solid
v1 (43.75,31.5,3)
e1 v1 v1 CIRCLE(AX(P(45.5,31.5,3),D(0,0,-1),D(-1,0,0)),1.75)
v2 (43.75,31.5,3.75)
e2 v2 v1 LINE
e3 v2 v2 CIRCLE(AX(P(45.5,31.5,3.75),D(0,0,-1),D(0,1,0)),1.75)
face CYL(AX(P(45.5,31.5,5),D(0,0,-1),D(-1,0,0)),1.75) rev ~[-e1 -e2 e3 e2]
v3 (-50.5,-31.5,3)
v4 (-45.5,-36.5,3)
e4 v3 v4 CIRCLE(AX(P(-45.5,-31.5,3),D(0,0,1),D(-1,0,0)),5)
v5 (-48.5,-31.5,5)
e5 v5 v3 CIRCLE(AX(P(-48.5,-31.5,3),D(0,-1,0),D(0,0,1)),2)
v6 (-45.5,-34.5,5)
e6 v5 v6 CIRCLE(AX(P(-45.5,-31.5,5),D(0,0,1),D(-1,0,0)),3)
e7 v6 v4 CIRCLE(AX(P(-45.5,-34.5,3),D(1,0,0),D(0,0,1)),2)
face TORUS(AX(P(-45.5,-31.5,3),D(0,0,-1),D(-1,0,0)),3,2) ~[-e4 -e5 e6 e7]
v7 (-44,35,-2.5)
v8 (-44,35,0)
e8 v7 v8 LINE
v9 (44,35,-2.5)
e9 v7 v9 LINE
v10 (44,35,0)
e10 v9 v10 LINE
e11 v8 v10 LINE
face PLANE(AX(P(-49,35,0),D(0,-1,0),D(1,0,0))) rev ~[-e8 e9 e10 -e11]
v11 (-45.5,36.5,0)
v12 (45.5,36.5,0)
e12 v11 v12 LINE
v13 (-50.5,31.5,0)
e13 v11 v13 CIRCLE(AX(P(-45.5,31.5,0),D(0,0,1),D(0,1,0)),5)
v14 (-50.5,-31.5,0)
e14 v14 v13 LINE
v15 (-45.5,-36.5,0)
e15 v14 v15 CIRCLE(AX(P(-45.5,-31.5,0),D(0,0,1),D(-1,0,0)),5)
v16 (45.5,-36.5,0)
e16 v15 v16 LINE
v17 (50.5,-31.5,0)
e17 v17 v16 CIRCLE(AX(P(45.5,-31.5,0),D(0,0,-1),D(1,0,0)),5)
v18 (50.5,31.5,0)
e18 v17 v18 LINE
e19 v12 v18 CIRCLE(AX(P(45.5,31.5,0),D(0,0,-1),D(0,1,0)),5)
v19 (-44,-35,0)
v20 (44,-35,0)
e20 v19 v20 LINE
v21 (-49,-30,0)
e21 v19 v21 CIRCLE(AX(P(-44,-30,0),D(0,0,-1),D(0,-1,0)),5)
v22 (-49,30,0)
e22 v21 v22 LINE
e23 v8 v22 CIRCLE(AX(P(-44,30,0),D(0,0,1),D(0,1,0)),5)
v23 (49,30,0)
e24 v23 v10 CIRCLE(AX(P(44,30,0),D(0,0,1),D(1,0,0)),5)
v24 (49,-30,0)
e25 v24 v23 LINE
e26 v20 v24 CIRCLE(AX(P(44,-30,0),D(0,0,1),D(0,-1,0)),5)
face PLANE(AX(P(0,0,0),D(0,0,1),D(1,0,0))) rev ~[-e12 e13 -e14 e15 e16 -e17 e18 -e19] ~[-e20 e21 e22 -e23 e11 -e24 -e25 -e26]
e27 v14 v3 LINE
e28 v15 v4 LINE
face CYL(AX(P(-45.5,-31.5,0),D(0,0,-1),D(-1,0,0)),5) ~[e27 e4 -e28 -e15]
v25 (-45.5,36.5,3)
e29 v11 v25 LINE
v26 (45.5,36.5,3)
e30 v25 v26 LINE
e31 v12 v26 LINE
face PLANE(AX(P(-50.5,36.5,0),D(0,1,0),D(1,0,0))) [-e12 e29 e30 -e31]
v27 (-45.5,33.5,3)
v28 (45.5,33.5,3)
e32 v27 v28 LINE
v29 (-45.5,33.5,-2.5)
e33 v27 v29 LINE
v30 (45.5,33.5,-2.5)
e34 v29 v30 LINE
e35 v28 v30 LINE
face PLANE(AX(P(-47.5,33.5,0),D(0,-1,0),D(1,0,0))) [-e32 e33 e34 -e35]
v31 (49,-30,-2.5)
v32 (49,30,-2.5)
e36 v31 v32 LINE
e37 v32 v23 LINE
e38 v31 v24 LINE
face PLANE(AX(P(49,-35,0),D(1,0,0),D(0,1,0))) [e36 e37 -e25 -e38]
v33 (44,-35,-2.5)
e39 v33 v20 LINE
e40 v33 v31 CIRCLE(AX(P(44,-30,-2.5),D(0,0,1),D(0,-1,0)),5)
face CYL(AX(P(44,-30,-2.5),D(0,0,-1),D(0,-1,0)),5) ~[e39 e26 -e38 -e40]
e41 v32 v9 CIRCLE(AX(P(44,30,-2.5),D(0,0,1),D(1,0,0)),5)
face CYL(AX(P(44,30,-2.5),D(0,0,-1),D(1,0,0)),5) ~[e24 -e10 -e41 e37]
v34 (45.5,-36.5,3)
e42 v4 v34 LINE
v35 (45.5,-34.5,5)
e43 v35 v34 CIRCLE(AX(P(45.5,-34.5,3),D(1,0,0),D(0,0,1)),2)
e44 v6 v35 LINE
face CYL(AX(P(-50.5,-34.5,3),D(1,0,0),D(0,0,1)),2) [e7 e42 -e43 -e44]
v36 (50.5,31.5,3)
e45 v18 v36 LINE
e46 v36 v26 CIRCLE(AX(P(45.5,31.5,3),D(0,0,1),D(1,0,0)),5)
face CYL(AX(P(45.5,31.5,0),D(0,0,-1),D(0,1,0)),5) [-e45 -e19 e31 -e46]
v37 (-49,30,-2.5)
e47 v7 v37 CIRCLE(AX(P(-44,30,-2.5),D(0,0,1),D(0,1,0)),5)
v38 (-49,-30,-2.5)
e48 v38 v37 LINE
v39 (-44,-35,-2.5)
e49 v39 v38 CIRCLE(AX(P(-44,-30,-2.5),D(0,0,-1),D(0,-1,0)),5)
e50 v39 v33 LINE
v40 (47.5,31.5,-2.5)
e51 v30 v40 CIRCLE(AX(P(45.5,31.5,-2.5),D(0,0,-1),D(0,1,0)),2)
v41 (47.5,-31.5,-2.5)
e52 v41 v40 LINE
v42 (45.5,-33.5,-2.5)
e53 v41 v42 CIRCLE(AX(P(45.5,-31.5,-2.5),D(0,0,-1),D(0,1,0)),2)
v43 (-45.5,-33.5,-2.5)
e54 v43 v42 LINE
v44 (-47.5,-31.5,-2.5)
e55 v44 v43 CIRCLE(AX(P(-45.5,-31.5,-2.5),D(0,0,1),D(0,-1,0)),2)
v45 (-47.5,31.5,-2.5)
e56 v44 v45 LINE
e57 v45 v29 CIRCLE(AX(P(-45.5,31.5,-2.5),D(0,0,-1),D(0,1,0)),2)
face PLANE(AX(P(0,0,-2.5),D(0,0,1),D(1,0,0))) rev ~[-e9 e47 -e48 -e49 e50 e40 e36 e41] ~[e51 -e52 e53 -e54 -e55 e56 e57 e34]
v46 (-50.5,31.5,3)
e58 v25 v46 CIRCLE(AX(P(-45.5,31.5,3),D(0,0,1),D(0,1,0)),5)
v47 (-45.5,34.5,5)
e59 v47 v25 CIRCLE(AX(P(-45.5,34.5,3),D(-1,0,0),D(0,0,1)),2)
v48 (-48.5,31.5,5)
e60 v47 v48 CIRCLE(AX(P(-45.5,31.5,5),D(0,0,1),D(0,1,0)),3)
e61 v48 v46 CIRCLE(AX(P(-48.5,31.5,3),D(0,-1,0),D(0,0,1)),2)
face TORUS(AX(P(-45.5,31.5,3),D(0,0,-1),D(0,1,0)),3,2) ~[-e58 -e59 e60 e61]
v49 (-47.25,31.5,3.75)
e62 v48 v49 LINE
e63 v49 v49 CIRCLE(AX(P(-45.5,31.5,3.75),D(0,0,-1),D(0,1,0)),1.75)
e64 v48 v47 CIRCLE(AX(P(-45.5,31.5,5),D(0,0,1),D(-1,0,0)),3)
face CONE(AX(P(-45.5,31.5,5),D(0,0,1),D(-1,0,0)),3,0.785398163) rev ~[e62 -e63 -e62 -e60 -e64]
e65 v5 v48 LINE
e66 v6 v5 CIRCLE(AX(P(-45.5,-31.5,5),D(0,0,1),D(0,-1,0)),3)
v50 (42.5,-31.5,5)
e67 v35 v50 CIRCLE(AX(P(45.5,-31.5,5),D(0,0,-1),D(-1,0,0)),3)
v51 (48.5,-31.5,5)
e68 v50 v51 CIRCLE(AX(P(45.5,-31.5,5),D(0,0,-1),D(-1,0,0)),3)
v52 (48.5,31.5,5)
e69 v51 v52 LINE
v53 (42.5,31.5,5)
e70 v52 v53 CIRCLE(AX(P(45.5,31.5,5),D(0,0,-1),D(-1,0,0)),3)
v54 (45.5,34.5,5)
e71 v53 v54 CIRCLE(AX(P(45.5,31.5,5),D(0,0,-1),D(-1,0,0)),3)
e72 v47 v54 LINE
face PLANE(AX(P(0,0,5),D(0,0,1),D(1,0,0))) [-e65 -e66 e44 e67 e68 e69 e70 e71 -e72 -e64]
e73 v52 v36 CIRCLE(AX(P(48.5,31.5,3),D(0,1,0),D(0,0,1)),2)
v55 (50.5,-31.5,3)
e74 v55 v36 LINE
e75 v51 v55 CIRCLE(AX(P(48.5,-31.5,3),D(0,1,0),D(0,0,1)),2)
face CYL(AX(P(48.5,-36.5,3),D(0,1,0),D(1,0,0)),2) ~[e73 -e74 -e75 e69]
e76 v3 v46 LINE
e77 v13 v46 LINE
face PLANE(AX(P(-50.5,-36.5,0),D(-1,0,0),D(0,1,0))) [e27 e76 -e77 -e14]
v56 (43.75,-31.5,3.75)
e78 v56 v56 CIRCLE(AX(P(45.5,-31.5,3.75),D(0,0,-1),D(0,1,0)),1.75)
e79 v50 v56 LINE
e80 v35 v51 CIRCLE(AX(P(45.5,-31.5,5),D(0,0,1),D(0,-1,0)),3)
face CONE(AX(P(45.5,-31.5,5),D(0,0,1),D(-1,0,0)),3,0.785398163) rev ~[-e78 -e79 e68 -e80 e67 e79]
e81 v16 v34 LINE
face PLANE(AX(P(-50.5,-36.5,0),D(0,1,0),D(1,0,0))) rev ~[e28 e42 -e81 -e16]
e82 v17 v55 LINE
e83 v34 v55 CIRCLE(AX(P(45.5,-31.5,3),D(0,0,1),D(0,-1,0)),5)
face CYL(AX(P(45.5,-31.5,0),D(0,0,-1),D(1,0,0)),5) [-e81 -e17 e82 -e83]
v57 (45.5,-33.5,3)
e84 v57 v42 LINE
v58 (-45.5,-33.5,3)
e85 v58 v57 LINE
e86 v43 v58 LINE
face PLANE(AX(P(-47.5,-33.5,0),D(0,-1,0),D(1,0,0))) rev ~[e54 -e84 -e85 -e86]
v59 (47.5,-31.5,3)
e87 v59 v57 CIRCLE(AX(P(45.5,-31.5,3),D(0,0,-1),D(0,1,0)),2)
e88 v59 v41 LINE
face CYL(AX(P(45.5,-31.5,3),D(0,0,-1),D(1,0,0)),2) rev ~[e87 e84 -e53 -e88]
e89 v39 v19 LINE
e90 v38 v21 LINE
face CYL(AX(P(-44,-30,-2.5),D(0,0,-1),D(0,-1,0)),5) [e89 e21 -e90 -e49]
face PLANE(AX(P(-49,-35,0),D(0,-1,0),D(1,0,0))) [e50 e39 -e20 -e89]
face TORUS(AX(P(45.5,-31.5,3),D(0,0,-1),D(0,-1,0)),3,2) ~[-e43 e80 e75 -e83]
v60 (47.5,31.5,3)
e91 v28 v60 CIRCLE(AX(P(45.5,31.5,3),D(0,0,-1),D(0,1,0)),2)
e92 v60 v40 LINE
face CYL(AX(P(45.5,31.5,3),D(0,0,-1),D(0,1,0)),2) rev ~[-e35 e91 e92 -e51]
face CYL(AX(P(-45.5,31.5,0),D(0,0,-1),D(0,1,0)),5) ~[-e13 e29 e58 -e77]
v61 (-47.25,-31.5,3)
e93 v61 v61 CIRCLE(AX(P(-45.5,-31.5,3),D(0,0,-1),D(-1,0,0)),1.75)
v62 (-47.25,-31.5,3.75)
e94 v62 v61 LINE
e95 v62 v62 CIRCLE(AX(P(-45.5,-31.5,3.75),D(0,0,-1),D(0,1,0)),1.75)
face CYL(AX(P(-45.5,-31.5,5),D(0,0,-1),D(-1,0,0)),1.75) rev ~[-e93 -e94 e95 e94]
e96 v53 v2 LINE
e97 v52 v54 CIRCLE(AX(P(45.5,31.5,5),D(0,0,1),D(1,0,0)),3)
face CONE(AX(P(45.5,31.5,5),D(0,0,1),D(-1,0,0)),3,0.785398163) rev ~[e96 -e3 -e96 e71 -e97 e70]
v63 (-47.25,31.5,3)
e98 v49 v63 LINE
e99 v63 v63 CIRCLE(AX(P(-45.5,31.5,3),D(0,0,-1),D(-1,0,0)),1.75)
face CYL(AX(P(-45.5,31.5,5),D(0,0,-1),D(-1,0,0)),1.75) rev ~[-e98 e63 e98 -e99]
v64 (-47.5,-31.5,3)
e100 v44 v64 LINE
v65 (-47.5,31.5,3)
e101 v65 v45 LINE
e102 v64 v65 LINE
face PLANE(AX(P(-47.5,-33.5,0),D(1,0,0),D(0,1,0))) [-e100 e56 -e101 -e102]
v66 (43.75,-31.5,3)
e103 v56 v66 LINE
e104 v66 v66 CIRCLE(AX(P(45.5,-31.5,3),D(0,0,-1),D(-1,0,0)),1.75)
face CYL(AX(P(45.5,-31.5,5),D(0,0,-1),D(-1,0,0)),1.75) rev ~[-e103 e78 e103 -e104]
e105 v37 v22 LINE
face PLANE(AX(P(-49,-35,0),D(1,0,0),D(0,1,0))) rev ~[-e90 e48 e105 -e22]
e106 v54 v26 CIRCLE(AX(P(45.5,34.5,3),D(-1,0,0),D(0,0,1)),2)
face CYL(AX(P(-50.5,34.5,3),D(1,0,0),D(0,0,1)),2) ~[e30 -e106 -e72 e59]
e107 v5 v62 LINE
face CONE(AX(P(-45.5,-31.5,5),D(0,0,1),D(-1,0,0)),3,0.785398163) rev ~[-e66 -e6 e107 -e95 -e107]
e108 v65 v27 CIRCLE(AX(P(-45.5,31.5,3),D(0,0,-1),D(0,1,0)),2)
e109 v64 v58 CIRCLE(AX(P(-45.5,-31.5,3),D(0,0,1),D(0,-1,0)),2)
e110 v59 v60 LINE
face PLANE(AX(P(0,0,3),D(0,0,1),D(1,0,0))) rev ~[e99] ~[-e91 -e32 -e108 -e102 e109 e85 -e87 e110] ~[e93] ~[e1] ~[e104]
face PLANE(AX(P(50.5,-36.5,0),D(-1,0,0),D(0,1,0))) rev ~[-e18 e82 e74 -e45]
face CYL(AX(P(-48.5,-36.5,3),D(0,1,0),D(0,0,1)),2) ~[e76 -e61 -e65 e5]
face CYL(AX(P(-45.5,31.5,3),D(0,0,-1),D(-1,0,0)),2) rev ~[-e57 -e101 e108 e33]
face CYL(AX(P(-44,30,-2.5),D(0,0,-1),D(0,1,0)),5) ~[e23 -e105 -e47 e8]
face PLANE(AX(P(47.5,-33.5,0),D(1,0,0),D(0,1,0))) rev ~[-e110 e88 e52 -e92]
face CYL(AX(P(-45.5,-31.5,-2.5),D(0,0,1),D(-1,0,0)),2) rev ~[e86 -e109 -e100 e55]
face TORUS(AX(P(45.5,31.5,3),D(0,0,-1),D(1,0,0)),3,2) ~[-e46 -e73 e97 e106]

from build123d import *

# Parameters (mm, degrees)
F0_W           = 101
F0_H           = 73
F0_W_2         = 98
F0_H_2         = 70
F0_W_3         = 95
F0_H_3         = 67
F1_DEPTH       = 5
F2_DEPTH       = 3
F3_DEPTH       = 2.5
F4_R           = 2
F5_T1_DEPTH    = 2.5
F5_T3_DEPTH    = 5
F5_T6_ANGLE    = 90
F5_T8_ANGLE    = 90
F5_T10_ANGLE   = 90
F5_T12_ANGLE   = 90
F7_D           = 3.5
F7_DEPTH       = 6
F7_CSINK_D     = 6
F7_CSINK_ANGLE = 90
F7_TIP         = 1.0515060833


# Not quite as in the source:
# - a fillet or chamfer that OpenCascade refuses, or shapes differently, is made with other operations: its cross-section is extruded or revolved along the edge and cut away or added
# - a feature names something its author has since deleted; it is built from what else it names


with BuildPart() as f1:
    # F0 (on Top) → F1 (new body)
    with BuildSketch(Plane.XY):
        Rectangle(F0_W, F0_H)
        Rectangle(F0_W_2, F0_H_2, mode=Mode.SUBTRACT)
        Rectangle(F0_W_2, F0_H_2)
        Rectangle(F0_W_3, F0_H_3, mode=Mode.SUBTRACT)
        Rectangle(F0_W_3, F0_H_3)
    extrude(amount=F1_DEPTH)

    # F0 (on Top) → F2 (cut)
    with BuildSketch(Plane.XY):
        Rectangle(F0_W_3, F0_H_3)
    extrude(amount=F2_DEPTH, mode=Mode.SUBTRACT)

    # F0 (on Top) → F3 (join)
    with BuildSketch(Plane.XY):
        Rectangle(F0_W_2, F0_H_2)
        Rectangle(F0_W_3, F0_H_3, mode=Mode.SUBTRACT)
    extrude(amount=-F3_DEPTH)

    # F4
    f4_edges = [f1.edges().sort_by_distance(p)[0] for p in [
        (-47.5, -33.5, 0.25),
        (-47.5, 33.5, 0.25),
        (47.5, 33.5, 0.25),
        (47.5, -33.5, 0.25),
        (0, -36.5, 5),
        (50.5, 0, 5),
        (-50.5, 0, 5),
        (0, 36.5, 5),
    ]]
    fillet(f4_edges, radius=F4_R)

    # F5: fillet of radius 5 on 8 edges, made by hand

    # F5_s2 → F5_t1 (cut)
    with BuildSketch(Plane.XY.offset(-2.5)):
        with BuildLine():
            ThreePointArc((-44, -35), (-47.5355339059, -33.5355339059), (-49, -30))
            Line((-49, -30), (-49.1, -30))
            Line((-49.1, -30), (-49.1, -35.1))
            Line((-49.1, -35.1), (-44, -35.1))
            Line((-44, -35.1), (-44, -35))
        make_face()
        with BuildLine():
            ThreePointArc((44, -35), (47.5355339059, -33.5355339059), (49, -30))
            Line((49, -30), (49.1, -30))
            Line((49.1, -30), (49.1, -35.1))
            Line((49.1, -35.1), (44, -35.1))
            Line((44, -35.1), (44, -35))
        make_face()
        with BuildLine():
            ThreePointArc((49, 30), (47.5355339059, 33.5355339059), (44, 35))
            Line((44, 35), (44, 35.1))
            Line((44, 35.1), (49.1, 35.1))
            Line((49.1, 35.1), (49.1, 30))
            Line((49.1, 30), (49, 30))
        make_face()
        with BuildLine():
            ThreePointArc((-44, 35), (-47.5355339059, 33.5355339059), (-49, 30))
            Line((-49, 30), (-49.1, 30))
            Line((-49.1, 30), (-49.1, 35.1))
            Line((-49.1, 35.1), (-44, 35.1))
            Line((-44, 35.1), (-44, 35))
        make_face()
    extrude(amount=F5_T1_DEPTH, mode=Mode.SUBTRACT)

    # F5_s4 → F5_t3 (cut)
    with BuildSketch(Plane.XY):
        with BuildLine():
            ThreePointArc((-50.5, -31.5), (-49.0355339059, -35.0355339059), (-45.5, -36.5))
            Line((-45.5, -36.5), (-45.5, -36.6))
            Line((-45.5, -36.6), (-50.6, -36.6))
            Line((-50.6, -36.6), (-50.6, -31.5))
            Line((-50.6, -31.5), (-50.5, -31.5))
        make_face()
        with BuildLine():
            ThreePointArc((50.5, -31.5), (49.0355339059, -35.0355339059), (45.5, -36.5))
            Line((45.5, -36.5), (45.5, -36.6))
            Line((45.5, -36.6), (50.6, -36.6))
            Line((50.6, -36.6), (50.6, -31.5))
            Line((50.6, -31.5), (50.5, -31.5))
        make_face()
        with BuildLine():
            ThreePointArc((45.5, 36.5), (49.0355339059, 35.0355339059), (50.5, 31.5))
            Line((50.5, 31.5), (50.6, 31.5))
            Line((50.6, 31.5), (50.6, 36.6))
            Line((50.6, 36.6), (45.5, 36.6))
            Line((45.5, 36.6), (45.5, 36.5))
        make_face()
        with BuildLine():
            ThreePointArc((-45.5, 36.5), (-49.0355339059, 35.0355339059), (-50.5, 31.5))
            Line((-50.5, 31.5), (-50.6, 31.5))
            Line((-50.6, 31.5), (-50.6, 36.6))
            Line((-50.6, 36.6), (-45.5, 36.6))
            Line((-45.5, 36.6), (-45.5, 36.5))
        make_face()
    extrude(amount=F5_T3_DEPTH, mode=Mode.SUBTRACT)

    # F5_s5 → F5_t6 (revolve, cut)
    with BuildSketch(Plane.YZ.offset(-45.5)):
        with BuildLine():
            ThreePointArc((34.5, 5), (35.9142135624, 4.4142135624), (36.5, 3))
            Line((36.5, 3), (36.5, 5))
            Line((36.5, 5), (34.5, 5))
        make_face()
    revolve(axis=Axis((-45.5, 31.5, 5), (0, 0, 1)), revolution_arc=F5_T6_ANGLE, mode=Mode.SUBTRACT)

    # F5_s7 → F5_t8 (revolve, cut)
    with BuildSketch(Plane.XZ.offset(-31.5)):
        with BuildLine():
            ThreePointArc((48.5, 5), (49.9142135624, 4.4142135624), (50.5, 3))
            Line((50.5, 3), (50.5, 5))
            Line((50.5, 5), (48.5, 5))
        make_face()
    revolve(axis=Axis((45.5, 31.5, 5), (0, 0, 1)), revolution_arc=F5_T8_ANGLE, mode=Mode.SUBTRACT)

    # F5_s9 → F5_t10 (revolve, cut)
    with BuildSketch(Plane.YZ.offset(45.5)):
        with BuildLine():
            ThreePointArc((-34.5, 5), (-35.9142135624, 4.4142135624), (-36.5, 3))
            Line((-36.5, 3), (-36.5, 5))
            Line((-36.5, 5), (-34.5, 5))
        make_face()
    revolve(axis=Axis((45.5, -31.5, 5), (0, 0, 1)), revolution_arc=F5_T10_ANGLE, mode=Mode.SUBTRACT)

    # F5_s11 → F5_t12 (revolve, cut)
    with BuildSketch(Plane.XZ.offset(31.5)):
        with BuildLine():
            ThreePointArc((-48.5, 5), (-49.9142135624, 4.4142135624), (-50.5, 3))
            Line((-50.5, 3), (-50.5, 5))
            Line((-50.5, 5), (-48.5, 5))
        make_face()
    revolve(axis=Axis((-45.5, -31.5, 5), (0, 0, 1)), revolution_arc=F5_T12_ANGLE, mode=Mode.SUBTRACT)

    # F7
    with Locations(Plane.XY.offset(5)):
        with Locations((45.5, -31.5), (-45.5, -31.5), (-45.5, 31.5), (45.5, 31.5)):
            CounterSinkHole(F7_D / 2, F7_CSINK_D / 2, depth=F7_DEPTH, counter_sink_angle=F7_CSINK_ANGLE)
            with Locations((0, 0, -(F7_DEPTH + F7_TIP / 2))):  # 118° drill point
                Cone(0, F7_D / 2, F7_TIP, mode=Mode.SUBTRACT)


solid = f1.part
